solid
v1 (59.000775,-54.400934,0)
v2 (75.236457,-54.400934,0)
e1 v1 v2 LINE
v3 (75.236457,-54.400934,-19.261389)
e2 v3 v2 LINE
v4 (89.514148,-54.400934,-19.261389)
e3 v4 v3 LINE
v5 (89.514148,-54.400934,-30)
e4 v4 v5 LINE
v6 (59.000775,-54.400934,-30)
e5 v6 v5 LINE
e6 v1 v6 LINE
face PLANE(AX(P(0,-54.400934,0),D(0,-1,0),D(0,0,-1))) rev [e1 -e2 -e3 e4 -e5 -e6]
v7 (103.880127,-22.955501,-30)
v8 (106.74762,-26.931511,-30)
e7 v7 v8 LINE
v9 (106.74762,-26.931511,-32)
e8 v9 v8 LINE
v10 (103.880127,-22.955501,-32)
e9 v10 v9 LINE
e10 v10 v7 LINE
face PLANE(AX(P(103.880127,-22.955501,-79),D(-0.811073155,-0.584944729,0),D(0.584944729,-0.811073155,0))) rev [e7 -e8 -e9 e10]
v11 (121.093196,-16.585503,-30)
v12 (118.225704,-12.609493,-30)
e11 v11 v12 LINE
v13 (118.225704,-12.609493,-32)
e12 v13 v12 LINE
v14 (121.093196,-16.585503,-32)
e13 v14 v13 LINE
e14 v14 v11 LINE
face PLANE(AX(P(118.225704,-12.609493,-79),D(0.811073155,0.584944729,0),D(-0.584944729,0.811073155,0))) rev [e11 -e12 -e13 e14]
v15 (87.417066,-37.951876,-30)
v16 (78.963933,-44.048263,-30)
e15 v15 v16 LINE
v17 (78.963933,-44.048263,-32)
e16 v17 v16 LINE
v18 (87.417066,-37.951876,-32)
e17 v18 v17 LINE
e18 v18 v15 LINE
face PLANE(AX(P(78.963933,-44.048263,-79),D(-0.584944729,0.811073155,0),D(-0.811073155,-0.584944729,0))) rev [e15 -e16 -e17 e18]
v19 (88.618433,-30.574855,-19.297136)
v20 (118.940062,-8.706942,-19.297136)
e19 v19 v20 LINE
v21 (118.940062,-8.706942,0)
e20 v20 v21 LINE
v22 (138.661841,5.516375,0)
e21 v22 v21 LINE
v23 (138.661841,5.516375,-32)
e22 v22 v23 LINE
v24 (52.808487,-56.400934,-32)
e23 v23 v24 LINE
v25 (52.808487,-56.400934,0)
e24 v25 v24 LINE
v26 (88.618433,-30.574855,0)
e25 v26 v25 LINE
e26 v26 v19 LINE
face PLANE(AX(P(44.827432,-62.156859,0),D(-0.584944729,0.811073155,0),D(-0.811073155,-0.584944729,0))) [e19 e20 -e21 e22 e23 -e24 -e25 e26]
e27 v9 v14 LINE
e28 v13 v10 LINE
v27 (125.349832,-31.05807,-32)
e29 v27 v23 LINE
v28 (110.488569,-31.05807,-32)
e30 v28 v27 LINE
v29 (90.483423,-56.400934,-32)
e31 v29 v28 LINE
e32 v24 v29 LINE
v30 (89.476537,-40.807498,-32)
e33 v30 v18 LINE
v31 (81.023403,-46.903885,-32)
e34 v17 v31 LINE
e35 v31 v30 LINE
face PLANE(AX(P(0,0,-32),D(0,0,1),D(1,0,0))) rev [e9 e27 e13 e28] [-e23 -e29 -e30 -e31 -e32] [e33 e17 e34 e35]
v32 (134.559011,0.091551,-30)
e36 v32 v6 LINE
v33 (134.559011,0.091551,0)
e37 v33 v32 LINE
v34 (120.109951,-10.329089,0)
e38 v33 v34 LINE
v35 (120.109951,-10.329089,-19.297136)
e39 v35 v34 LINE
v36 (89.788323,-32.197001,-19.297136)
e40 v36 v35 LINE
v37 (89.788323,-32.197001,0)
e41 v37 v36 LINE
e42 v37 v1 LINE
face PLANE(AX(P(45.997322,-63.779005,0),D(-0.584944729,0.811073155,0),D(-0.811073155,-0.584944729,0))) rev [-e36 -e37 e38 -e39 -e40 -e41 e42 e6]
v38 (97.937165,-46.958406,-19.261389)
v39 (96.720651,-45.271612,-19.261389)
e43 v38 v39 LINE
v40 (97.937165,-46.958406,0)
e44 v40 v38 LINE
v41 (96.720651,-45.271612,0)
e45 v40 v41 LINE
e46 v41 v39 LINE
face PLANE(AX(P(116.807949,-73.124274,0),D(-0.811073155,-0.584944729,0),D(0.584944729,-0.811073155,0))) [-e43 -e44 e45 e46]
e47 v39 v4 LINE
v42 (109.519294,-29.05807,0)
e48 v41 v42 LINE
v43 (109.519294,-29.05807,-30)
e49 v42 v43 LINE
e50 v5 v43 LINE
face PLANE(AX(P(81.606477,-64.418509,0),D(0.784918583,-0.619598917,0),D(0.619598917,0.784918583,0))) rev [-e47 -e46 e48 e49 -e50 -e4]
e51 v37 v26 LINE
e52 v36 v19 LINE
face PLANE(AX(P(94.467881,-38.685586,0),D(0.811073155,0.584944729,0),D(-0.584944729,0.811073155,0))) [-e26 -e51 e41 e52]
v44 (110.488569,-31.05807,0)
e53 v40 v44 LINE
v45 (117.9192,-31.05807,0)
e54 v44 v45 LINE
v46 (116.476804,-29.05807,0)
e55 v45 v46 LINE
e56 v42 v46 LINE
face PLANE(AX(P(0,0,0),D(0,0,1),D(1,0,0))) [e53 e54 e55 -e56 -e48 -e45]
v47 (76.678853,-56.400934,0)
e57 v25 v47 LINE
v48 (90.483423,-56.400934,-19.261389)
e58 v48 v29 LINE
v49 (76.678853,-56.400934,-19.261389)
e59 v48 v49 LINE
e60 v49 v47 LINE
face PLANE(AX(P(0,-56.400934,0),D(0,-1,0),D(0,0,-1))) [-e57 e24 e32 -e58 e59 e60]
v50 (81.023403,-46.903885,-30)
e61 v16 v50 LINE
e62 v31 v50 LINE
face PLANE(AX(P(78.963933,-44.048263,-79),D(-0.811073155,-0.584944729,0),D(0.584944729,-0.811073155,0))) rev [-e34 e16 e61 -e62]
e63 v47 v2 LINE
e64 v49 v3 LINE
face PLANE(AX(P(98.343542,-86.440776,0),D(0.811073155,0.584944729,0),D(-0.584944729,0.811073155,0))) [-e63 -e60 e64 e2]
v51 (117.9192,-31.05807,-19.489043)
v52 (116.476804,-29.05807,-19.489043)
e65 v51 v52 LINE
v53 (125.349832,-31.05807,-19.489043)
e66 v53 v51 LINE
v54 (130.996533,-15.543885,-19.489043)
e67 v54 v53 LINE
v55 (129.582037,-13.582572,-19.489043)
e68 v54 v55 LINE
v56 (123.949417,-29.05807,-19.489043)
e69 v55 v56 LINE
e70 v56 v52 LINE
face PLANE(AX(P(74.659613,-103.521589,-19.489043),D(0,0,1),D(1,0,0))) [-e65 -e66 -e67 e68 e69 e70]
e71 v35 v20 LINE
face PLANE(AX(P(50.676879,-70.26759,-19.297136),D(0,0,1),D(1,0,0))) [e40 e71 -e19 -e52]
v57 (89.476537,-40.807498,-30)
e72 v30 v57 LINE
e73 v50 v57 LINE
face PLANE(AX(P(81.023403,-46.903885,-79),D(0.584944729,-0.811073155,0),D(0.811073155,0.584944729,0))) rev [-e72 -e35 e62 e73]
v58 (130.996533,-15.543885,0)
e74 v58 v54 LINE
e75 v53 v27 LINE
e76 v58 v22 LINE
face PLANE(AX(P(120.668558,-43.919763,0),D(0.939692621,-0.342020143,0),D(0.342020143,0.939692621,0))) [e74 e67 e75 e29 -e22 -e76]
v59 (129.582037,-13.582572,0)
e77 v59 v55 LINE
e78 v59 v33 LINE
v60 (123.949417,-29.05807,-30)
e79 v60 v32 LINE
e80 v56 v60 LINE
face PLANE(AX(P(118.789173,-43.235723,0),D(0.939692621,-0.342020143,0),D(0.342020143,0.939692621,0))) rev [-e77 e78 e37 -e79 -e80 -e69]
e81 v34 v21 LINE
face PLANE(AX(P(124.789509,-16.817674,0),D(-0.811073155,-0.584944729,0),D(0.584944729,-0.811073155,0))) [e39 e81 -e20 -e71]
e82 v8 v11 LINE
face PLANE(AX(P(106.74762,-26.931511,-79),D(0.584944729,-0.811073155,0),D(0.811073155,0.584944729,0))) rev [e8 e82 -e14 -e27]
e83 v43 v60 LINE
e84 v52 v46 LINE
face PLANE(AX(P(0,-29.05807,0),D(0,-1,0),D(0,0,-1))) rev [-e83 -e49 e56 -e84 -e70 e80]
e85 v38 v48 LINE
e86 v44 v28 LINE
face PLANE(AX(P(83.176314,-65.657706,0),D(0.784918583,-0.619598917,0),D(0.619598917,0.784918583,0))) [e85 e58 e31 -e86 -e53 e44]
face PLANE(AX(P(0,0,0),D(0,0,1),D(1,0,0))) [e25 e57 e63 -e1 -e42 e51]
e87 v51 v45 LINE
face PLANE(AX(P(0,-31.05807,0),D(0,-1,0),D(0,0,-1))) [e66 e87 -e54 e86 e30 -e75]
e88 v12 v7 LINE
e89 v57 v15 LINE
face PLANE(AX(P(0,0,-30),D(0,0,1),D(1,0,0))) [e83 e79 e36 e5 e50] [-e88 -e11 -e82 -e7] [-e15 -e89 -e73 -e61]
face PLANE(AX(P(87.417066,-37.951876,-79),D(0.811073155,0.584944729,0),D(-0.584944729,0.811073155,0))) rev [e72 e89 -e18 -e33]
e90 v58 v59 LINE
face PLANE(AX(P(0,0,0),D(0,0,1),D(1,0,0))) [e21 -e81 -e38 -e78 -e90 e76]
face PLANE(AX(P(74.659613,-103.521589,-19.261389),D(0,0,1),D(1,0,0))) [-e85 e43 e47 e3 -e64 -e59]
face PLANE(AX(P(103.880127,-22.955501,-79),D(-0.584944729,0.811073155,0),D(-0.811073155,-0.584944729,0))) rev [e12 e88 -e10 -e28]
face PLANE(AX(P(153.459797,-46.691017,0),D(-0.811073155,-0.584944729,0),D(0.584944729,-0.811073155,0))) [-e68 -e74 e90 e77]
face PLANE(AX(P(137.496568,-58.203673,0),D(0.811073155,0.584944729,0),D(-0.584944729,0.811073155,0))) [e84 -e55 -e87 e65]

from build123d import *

# Parameters (mm, degrees)
SHELL_3_T            = 2
SKETCH_10_W          = 22.765402734
SKETCH_10_H          = 19.26138917
SKETCH_10_W_2        = 19.681614291
SKETCH_10_H_2        = 19.489043198
CUT_EXTRUDE_8_DEPTH  = 49
SKETCH_9_W           = 37.384578993
SKETCH_9_H           = 19.297136137
CUT_EXTRUDE_5_DEPTH  = 10
CUT_EXTRUDE_10_DEPTH = 49


with BuildPart() as part:
    # 草图5 → 放样2 section 0
    with BuildSketch(Plane.XY):
        with BuildLine():
            Line((123.949416554, -29.058070489), (134.559011277, 0.091551442))
            Line((134.559011277, 0.091551442), (59.000774753, -54.400934133))
            Line((59.000774753, -54.400934133), (89.51414806, -54.400934133))
            Line((89.51414806, -54.400934133), (109.519294053, -29.058070489))
            Line((109.519294053, -29.058070489), (123.949416554, -29.058070489))
        make_face()
    # 草图2 → 放样2 section 1
    with BuildSketch(Plane.XY.offset(-30)):
        with BuildLine():
            Line((134.559011277, 0.091551442), (123.949416554, -29.058070489))
            Line((123.949416554, -29.058070489), (109.519294053, -29.058070489))
            Line((109.519294053, -29.058070489), (89.51414806, -54.400934133))
            Line((89.51414806, -54.400934133), (59.000774753, -54.400934133))
            Line((59.000774753, -54.400934133), (134.559011277, 0.091551442))
        make_face()
    loft()

    # 抽壳3
    shell_3_openings = [part.faces().sort_by_distance(p)[0] for p in [
        (99.793796859, -32.953132271, 0),
    ]]
    offset(amount=SHELL_3_T, openings=shell_3_openings, kind=Kind.INTERSECTION)

    # 草图10 → 切除-拉伸8 (cut)
    with BuildSketch(Plane(origin=(45.99732156, -63.779004852, 0), x_dir=(0.8110731554347567, 0.5849447294686114, 0), z_dir=(0.5849447294686114, -0.8110731554347567, 0))):
        with Locations((40.58343187, -9.630694585)):
            Rectangle(SKETCH_10_W, SKETCH_10_H)
        with Locations((87.31465052, -9.744521599)):
            Rectangle(SKETCH_10_W_2, SKETCH_10_H_2)
    extrude(amount=CUT_EXTRUDE_8_DEPTH, mode=Mode.SUBTRACT)

    # 草图9 → 切除-拉伸5 (cut)
    with BuildSketch(Plane(origin=(44.827432101, -62.156858541, 0), x_dir=(0.8110731554347567, 0.5849447294686114, 0), z_dir=(-0.5849447294686114, 0.8110731554347567, 0))):
        with Locations((72.683721601, 9.648568069)):
            Rectangle(SKETCH_9_W, SKETCH_9_H)
    extrude(amount=-CUT_EXTRUDE_5_DEPTH, mode=Mode.SUBTRACT)

    # 草图13 → 切除-拉伸10 (cut)
    with BuildSketch(Plane.XY.offset(-30)):
        Polygon((78.963932985, -44.04826302), (81.023403307, -46.903885112), (89.476536517, -40.807498262), (87.417066196, -37.95187617), align=None)
        Polygon((103.880127445, -22.95550088), (118.225703578, -12.609493132), (121.093195937, -16.585503101), (106.747619804, -26.931510849), align=None)
    extrude(amount=-CUT_EXTRUDE_10_DEPTH, mode=Mode.SUBTRACT)


solid = part.part
